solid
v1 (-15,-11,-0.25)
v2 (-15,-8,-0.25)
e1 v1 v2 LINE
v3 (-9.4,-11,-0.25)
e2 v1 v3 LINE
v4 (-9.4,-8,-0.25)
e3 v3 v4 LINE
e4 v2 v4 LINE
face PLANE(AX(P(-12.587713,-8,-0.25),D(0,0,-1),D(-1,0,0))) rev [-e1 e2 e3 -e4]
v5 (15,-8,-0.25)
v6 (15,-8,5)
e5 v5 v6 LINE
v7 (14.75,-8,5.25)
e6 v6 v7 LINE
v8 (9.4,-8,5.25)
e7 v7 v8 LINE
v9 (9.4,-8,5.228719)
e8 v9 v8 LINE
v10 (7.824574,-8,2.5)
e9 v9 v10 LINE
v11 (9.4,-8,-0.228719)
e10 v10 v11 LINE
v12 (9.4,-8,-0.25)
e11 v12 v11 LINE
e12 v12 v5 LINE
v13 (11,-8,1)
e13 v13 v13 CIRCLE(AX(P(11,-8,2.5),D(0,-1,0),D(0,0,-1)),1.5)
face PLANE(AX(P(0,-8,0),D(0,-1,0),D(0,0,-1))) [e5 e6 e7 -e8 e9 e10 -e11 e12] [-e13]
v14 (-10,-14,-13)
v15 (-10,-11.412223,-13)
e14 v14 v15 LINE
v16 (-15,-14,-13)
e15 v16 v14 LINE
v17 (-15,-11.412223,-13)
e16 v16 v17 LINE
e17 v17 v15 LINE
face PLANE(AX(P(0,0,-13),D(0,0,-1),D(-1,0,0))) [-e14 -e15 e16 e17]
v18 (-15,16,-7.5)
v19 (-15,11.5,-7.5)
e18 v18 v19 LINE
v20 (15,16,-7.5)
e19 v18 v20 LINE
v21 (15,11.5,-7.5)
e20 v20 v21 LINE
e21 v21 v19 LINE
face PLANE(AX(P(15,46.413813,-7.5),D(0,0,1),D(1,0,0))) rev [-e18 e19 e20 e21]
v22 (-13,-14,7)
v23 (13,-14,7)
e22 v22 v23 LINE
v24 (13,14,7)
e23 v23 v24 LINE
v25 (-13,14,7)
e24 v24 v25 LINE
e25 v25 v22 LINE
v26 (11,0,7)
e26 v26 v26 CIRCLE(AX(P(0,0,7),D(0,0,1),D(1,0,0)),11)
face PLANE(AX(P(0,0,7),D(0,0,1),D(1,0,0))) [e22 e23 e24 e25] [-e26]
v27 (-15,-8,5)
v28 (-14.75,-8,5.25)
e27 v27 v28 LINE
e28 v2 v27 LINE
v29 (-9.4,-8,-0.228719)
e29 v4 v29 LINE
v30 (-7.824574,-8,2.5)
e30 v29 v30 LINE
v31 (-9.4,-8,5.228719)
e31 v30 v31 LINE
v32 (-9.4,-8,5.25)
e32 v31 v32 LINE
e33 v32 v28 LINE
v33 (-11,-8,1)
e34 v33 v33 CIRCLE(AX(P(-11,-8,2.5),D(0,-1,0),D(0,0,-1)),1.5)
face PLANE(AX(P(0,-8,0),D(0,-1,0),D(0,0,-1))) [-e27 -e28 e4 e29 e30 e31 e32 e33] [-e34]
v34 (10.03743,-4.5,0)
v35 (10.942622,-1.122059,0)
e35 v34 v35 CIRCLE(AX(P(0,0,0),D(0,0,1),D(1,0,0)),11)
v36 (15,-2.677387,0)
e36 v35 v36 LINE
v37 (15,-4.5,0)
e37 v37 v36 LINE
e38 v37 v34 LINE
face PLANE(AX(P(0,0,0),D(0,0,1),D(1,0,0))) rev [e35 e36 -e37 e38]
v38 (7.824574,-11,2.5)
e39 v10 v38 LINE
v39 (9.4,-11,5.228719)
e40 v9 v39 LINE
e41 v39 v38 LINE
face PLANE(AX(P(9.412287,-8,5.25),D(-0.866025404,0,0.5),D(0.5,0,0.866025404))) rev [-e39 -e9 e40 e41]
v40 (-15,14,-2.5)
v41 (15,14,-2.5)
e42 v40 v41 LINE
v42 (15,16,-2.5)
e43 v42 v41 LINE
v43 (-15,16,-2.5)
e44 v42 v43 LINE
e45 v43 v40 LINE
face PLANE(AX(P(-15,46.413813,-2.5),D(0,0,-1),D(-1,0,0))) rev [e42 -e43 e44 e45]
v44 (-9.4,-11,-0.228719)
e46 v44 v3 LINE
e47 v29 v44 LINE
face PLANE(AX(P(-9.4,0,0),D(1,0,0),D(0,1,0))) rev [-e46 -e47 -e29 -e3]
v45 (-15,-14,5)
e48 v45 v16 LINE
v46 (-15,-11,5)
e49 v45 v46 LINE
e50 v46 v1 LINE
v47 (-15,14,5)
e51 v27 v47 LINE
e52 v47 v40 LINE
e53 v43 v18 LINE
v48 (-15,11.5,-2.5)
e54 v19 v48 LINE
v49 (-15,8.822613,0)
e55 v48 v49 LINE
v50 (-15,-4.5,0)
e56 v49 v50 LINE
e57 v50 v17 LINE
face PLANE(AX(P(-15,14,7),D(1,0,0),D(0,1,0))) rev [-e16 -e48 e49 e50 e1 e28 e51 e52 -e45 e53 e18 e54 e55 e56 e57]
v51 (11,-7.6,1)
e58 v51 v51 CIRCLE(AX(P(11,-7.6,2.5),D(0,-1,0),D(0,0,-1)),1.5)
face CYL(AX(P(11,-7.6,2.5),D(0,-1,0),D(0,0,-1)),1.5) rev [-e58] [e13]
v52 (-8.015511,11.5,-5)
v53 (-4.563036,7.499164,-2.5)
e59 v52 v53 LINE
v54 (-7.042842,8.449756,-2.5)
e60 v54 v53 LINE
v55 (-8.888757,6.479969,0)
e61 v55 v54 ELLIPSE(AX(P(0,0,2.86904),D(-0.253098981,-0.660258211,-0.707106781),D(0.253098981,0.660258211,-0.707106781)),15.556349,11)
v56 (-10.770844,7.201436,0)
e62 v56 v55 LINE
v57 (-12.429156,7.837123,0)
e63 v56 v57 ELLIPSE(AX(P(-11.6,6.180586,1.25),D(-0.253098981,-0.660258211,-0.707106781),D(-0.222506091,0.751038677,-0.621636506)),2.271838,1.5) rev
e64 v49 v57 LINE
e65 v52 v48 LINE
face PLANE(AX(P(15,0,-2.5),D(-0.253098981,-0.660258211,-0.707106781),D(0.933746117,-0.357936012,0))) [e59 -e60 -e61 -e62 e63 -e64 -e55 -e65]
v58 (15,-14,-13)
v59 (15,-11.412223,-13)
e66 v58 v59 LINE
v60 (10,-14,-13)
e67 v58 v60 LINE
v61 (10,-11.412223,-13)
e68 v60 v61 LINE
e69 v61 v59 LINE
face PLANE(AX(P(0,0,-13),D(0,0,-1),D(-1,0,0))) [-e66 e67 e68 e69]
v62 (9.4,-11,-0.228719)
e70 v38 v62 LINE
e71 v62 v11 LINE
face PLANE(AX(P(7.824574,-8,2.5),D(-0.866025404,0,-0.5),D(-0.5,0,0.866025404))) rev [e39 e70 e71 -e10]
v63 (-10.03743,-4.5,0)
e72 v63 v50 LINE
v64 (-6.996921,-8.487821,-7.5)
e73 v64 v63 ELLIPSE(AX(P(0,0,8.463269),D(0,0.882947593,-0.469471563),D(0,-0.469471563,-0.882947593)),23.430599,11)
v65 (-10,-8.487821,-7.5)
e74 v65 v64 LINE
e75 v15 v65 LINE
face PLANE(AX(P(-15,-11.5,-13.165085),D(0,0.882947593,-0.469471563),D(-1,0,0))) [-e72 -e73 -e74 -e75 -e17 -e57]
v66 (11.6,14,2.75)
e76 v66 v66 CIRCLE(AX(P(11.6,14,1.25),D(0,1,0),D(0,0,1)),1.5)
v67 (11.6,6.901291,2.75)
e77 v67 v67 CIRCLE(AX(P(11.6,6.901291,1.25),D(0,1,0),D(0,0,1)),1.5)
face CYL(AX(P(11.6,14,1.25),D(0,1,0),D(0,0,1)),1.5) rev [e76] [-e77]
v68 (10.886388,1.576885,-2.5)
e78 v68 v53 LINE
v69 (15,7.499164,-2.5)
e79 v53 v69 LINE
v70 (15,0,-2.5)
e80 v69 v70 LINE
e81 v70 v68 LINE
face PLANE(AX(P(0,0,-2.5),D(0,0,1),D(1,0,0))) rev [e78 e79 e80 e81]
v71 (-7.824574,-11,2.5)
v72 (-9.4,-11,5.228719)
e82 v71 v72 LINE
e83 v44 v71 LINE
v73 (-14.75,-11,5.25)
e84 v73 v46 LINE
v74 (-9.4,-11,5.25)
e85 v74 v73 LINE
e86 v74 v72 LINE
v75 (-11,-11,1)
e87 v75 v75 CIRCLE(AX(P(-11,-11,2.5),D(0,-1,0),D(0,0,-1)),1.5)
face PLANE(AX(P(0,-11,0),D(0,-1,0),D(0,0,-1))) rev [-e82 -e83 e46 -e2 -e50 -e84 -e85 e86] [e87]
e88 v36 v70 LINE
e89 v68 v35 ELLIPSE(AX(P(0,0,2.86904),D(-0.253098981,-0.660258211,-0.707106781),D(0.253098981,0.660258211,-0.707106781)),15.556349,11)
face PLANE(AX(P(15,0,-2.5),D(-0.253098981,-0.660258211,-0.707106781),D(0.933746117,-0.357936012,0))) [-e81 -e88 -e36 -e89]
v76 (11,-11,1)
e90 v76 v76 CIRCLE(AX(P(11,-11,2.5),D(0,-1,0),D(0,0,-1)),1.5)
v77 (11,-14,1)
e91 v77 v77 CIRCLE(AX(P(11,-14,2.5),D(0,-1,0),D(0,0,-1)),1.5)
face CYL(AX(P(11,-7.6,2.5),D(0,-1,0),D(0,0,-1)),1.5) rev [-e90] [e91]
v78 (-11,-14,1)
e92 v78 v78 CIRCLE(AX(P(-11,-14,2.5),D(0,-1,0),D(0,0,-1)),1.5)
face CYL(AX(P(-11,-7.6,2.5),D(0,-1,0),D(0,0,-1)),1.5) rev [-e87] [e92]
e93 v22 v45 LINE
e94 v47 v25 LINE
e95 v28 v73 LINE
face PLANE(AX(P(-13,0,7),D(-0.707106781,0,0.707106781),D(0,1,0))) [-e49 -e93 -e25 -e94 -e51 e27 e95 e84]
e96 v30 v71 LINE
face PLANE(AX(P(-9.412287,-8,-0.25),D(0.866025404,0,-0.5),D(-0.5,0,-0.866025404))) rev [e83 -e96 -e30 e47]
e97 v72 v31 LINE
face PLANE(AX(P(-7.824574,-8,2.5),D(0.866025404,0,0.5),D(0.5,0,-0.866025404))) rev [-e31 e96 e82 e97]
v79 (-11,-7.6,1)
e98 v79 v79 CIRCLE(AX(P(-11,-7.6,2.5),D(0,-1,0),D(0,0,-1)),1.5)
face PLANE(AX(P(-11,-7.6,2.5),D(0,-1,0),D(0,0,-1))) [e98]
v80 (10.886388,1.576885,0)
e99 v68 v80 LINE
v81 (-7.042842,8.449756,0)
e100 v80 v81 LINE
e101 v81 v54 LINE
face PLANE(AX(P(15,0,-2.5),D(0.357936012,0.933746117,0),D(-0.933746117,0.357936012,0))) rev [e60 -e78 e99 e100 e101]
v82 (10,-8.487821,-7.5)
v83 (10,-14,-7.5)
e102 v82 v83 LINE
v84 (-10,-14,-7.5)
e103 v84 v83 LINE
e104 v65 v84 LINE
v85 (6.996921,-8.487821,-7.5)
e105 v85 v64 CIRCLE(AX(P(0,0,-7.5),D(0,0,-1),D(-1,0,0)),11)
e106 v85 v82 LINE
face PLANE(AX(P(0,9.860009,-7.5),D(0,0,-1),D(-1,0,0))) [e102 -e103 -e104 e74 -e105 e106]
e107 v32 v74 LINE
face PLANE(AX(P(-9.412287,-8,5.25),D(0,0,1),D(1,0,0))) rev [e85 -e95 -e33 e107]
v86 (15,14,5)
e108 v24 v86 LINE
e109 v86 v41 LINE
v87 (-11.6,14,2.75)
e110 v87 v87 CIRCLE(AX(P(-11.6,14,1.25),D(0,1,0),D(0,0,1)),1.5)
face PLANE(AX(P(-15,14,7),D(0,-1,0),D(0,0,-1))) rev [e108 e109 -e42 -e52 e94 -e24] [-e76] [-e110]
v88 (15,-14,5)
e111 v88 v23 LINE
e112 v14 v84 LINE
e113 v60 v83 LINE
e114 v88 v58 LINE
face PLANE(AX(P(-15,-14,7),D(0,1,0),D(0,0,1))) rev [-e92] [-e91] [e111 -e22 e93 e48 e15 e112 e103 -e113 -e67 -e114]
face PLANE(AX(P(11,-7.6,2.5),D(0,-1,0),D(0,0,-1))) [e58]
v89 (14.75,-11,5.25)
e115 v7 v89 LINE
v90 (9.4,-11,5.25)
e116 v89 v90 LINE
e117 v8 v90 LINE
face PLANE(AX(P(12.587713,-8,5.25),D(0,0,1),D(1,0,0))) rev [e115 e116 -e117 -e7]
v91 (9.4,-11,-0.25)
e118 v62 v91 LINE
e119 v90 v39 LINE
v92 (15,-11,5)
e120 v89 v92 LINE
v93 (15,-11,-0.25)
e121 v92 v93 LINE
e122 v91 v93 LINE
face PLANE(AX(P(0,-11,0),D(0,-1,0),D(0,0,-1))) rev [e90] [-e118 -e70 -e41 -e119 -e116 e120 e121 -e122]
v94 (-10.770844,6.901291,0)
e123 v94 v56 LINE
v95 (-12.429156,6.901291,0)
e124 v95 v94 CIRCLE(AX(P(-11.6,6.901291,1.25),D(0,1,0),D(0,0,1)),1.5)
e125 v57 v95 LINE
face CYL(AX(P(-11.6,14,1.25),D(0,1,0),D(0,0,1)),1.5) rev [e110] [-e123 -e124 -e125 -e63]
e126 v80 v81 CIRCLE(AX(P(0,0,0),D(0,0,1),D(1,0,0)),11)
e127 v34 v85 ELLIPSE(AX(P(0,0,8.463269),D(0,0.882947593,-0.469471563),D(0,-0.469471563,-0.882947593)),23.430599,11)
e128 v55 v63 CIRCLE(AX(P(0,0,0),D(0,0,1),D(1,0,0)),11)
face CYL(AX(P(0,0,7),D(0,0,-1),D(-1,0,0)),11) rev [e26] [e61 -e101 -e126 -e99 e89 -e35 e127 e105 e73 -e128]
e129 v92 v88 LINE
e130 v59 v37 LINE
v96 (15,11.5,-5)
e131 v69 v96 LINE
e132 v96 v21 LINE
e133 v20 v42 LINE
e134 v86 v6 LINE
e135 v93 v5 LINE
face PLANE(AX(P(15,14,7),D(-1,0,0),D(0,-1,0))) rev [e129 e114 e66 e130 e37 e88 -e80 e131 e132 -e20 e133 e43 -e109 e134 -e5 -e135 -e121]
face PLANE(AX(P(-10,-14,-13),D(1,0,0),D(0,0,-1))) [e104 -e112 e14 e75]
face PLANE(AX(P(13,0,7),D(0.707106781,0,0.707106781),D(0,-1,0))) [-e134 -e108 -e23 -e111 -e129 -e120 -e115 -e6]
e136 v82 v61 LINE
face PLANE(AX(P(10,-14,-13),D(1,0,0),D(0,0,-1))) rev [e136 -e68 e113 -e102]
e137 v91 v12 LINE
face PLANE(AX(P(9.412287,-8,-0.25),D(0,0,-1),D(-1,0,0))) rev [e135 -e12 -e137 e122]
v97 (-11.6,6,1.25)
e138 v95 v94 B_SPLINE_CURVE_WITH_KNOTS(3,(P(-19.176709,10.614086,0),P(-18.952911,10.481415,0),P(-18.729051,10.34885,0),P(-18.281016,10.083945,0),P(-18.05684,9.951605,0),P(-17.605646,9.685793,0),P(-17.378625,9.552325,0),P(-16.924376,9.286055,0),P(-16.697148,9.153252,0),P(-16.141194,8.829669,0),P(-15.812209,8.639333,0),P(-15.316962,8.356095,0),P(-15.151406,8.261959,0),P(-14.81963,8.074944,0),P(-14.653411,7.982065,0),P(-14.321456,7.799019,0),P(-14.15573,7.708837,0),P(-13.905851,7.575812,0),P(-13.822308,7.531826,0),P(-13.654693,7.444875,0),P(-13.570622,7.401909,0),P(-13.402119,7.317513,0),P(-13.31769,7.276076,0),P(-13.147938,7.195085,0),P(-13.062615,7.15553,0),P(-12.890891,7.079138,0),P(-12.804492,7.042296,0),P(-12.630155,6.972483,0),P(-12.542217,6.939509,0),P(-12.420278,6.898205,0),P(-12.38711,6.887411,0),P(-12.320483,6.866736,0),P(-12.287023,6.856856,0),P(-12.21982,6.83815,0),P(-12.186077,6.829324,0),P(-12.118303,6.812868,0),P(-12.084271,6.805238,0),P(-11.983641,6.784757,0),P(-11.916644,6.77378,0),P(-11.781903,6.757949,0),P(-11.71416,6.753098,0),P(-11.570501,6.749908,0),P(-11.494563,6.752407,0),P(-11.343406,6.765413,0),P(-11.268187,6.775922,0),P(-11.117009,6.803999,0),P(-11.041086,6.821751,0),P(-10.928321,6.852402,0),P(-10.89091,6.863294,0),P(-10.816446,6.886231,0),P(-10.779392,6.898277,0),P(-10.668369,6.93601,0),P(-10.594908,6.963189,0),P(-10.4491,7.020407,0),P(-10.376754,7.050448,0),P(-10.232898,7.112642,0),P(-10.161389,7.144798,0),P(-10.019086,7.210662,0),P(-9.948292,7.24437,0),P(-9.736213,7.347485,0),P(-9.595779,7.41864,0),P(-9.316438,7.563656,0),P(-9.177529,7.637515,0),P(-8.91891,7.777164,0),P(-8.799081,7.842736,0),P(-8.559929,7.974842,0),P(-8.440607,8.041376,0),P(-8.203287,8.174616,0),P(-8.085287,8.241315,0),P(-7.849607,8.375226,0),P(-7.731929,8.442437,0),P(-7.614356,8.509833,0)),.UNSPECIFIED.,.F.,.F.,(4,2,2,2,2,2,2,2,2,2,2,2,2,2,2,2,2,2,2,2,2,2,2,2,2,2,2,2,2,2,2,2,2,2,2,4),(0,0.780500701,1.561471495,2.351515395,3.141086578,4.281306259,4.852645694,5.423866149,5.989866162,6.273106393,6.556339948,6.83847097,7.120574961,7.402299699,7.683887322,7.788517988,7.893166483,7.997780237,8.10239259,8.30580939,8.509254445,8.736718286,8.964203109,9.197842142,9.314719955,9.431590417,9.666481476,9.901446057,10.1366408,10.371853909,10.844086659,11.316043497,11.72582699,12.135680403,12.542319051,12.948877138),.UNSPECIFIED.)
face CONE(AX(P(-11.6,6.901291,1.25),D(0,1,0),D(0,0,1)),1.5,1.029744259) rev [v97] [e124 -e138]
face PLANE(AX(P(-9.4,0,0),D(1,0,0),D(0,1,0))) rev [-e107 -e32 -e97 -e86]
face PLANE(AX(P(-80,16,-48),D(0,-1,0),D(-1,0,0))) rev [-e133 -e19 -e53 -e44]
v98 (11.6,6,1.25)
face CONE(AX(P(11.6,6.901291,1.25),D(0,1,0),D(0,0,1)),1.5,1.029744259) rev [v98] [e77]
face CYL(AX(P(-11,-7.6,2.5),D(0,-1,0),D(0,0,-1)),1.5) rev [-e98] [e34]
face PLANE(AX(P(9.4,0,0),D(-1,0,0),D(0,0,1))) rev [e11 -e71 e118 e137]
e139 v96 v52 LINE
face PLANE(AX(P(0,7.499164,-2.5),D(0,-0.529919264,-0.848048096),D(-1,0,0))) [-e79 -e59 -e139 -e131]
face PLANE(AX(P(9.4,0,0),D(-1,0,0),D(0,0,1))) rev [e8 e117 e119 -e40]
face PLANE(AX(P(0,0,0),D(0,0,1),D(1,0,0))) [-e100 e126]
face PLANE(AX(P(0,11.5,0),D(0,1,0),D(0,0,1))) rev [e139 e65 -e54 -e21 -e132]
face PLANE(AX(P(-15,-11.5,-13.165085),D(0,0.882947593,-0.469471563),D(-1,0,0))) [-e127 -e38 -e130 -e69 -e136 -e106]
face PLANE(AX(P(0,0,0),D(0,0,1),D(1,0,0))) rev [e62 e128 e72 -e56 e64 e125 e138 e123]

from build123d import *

# Parameters (mm, degrees)
SKETCH1_W                 = 30
SKETCH1_H                 = 28
SKETCH1_R                 = 11
BOSS_EXTRUDE1_DEPTH       = 7
SKETCH2_W                 = 5
SKETCH2_H                 = 2.5
BOSS_EXTRUDE2_DEPTH       = 13
CHAMFER2_SIZE             = 2
BOSS_EXTRUDE6_DEPTH       = 2.5
CHAMFER3_SIZE             = 2
CHAMFER4_SIZE             = 2
BOSS_EXTRUDE4_DEPTH       = 2.5
CHAMFER6_SIZE             = 2.5
CHAMFER7_SIZE             = 7
CHAMFER7_SIZE_2           = 13.165085257
SKETCH7_R                 = 1.5
CUT_EXTRUDE2_DEPTH        = 6.4
BOSS_EXTRUDE7_START       = -2.5
SKETCH8_W                 = 30
SKETCH8_H                 = 5
BOSS_EXTRUDE7_DEPTH       = 4.5
CHAMFER8_SIZE             = 4.000836323
CHAMFER8_SIZE_2           = 2.5
CUT_EXTRUDE3_START        = -3
SKETCH9_R                 = 1.5
CUT_EXTRUDE3_DEPTH        = 3
SKETCH10_W                = 5.5
SKETCH10_H                = 3
CUT_EXTRUDE4_DEPTH        = 5.6
CUT_EXTRUDE5_START        = -30
SKETCH10_2_W              = 5.5
SKETCH10_2_H              = 3
CUT_EXTRUDE5_DEPTH        = 5.6
F_1_0MM_DOWEL_HOLE1_D     = 3
F_1_0MM_DOWEL_HOLE1_DEPTH = 7.098709071
F_1_0MM_DOWEL_HOLE1_TIP   = 0.901290929


with BuildPart() as part:
    # Sketch1 → Boss-Extrude1 (new body)
    with BuildSketch(Plane.XY):
        Rectangle(SKETCH1_W, SKETCH1_H)
        Circle(SKETCH1_R, mode=Mode.SUBTRACT)
    extrude(amount=BOSS_EXTRUDE1_DEPTH)

    # Sketch2 → Boss-Extrude2 (add)
    with BuildSketch(Plane(origin=(0, 0, 0), x_dir=(-1, 0, 0), z_dir=(0, 0, -1))):
        with Locations((-12.5, -12.75)):
            Rectangle(SKETCH2_W, SKETCH2_H)
        with Locations((12.5, -12.75)):
            Rectangle(SKETCH2_W, SKETCH2_H)
    extrude(amount=BOSS_EXTRUDE2_DEPTH)

    # Chamfer2
    chamfer2_edges = [part.edges().sort_by_distance(p)[0] for p in [
        (-10, -12.75, 0),
        (10, -12.75, 0),
    ]]
    chamfer(chamfer2_edges, length=CHAMFER2_SIZE)

    # Sketch5 → Boss-Extrude6 (add)
    with BuildSketch(Plane.XZ.offset(14)):
        Polygon((-10, -2), (-10, -7.5), (10, -7.5), (10, -2), (8, 0), (-8, 0), align=None)
    extrude(amount=-BOSS_EXTRUDE6_DEPTH)

    # Chamfer3
    chamfer3_edges = [part.edges().sort_by_distance(p)[0] for p in [
        (15, 0, 7),
    ]]
    chamfer(chamfer3_edges, length=CHAMFER3_SIZE)

    # Chamfer4
    chamfer4_edges = [part.edges().sort_by_distance(p)[0] for p in [
        (-15, 0, 7),
    ]]
    chamfer(chamfer4_edges, length=CHAMFER4_SIZE)

    # Sketch4 → Boss-Extrude4 (add)
    with BuildSketch(Plane(origin=(0, 0, 0), x_dir=(-1, 0, 0), z_dir=(0, 0, -1))):
        Polygon((-15, 0), (15, 11.5), (15, 14), (-15, 14), align=None)
    extrude(amount=BOSS_EXTRUDE4_DEPTH)

    # Chamfer6
    # the kernel refuses this chamfer: 2.5 mm, written as the material it adds along each edge
    with BuildSketch(Plane(origin=(21.003247512, -2.30124488, 0), x_dir=(-0.3578006820796162, -0.9333930836859554, 0.02749587661058638), z_dir=(-0.9337461173020497, 0.35793601163245237, 0))) as chamfer6_piece_1_section:
        Polygon((CHAMFER6_SIZE * 0.999621916911, -CHAMFER6_SIZE * 0.0274958766106), (-CHAMFER6_SIZE * 0.0274958766106, -CHAMFER6_SIZE * 0.999621916911), (0, 0), align=None)
    chamfer6_piece_1 = extrude(amount=17.263908412, mode=Mode.PRIVATE)
    chamfer6_piece_1 = chamfer6_piece_1 - Plane(origin=(0, 0, -0.835393566), x_dir=(1, 0, 0), z_dir=(0, 0, -1)) * Cylinder(11, 45, mode=Mode.PRIVATE)
    chamfer6_piece_1 = split(chamfer6_piece_1, bisect_by=Plane(origin=(15, -0.113968884, -0.835393566), z_dir=(-1, 0, 0)), keep=Keep.TOP, mode=Mode.PRIVATE)
    add(chamfer6_piece_1)
    with BuildSketch(Plane(origin=(-1.03959441, 6.148511191, 0), x_dir=(-0.35780068207961624, -0.9333930836859554, 0.02749587661058638), z_dir=(-0.9337461173020497, 0.35793601163245237, 0))) as chamfer6_piece_2_section:
        Polygon((CHAMFER6_SIZE * 0.999621916911, -CHAMFER6_SIZE * 0.0274958766106), (-CHAMFER6_SIZE * 0.0274958766106, -CHAMFER6_SIZE * 0.999621916911), (0, 0), align=None)
    chamfer6_piece_2 = extrude(amount=21.380172546, mode=Mode.PRIVATE)
    chamfer6_piece_2 = chamfer6_piece_2 - Plane(origin=(0, 0, -0.851534645), x_dir=(1, 0, 0), z_dir=(0, 0, -1)) * Cylinder(11, 53, mode=Mode.PRIVATE)
    chamfer6_piece_2 = split(chamfer6_piece_2, bisect_by=Plane(origin=(-15, 9.244820467, -0.851534645), z_dir=(1, 0, 0)), keep=Keep.TOP, mode=Mode.PRIVATE)
    add(chamfer6_piece_2)

    # Chamfer7
    # the kernel refuses this chamfer: 13.165085257, 7 mm, written as the material it adds along each edge
    with BuildSketch(Plane(origin=(-15, -11.5, 0), x_dir=(0, 0.9979482451756082, 0.06402577567608186), z_dir=(1, 0, 0))) as chamfer7_piece_1_section:
        Polygon((CHAMFER7_SIZE * 0.997948245176, -CHAMFER7_SIZE * 0.0640257756761), (-CHAMFER7_SIZE_2 * 0.0640257756781, -CHAMFER7_SIZE_2 * 0.997948245208), (0, 0), align=None)
    chamfer7_piece_1 = extrude(amount=30, mode=Mode.PRIVATE)
    chamfer7_piece_1 = chamfer7_piece_1 - Plane(origin=(0, 0, -3.073682767), x_dir=(1, 0, 0), z_dir=(0, 0, -1)) * Cylinder(11, 113, mode=Mode.PRIVATE)
    chamfer7_piece_1 = split(chamfer7_piece_1, bisect_by=Plane(origin=(-10, -8.887755394, -3.073682767), z_dir=(-1, 0, 0)), keep=Keep.TOP, mode=Mode.PRIVATE)
    chamfer7_piece_1 = split(chamfer7_piece_1, bisect_by=Plane(origin=(-12.500128058, -8.887755394, -7.5), z_dir=(0, 0, 1)), keep=Keep.TOP, mode=Mode.PRIVATE)
    add(chamfer7_piece_1)
    with BuildSketch(Plane(origin=(-15, -11.5, 0), x_dir=(0, 0.9979482451756082, 0.06402577567608186), z_dir=(1, 0, 0))) as chamfer7_piece_2_section:
        Polygon((CHAMFER7_SIZE * 0.997948245176, -CHAMFER7_SIZE * 0.0640257756761), (-CHAMFER7_SIZE_2 * 0.0640257756781, -CHAMFER7_SIZE_2 * 0.997948245208), (0, 0), align=None)
    chamfer7_piece_2 = extrude(amount=30, mode=Mode.PRIVATE)
    chamfer7_piece_2 = split(chamfer7_piece_2, bisect_by=Plane(origin=(-10, -10.721530873, -9.597564575), z_dir=(-1, 0, 0)), keep=Keep.TOP, mode=Mode.PRIVATE)
    chamfer7_piece_2 = split(chamfer7_piece_2, bisect_by=Plane(origin=(-12.5, -10.721530873, -7.5), z_dir=(0, 0, -1)), keep=Keep.TOP, mode=Mode.PRIVATE)
    chamfer7_piece_2 = split(chamfer7_piece_2, bisect_by=Plane(origin=(-12.5, -10.721530873, -13), z_dir=(0, 0, 1)), keep=Keep.TOP, mode=Mode.PRIVATE)
    add(chamfer7_piece_2)
    with BuildSketch(Plane(origin=(-15, -11.5, 0), x_dir=(0, 0.9979482451756082, 0.06402577567608186), z_dir=(1, 0, 0))) as chamfer7_piece_3_section:
        Polygon((CHAMFER7_SIZE * 0.997948245176, -CHAMFER7_SIZE * 0.0640257756761), (-CHAMFER7_SIZE_2 * 0.0640257756781, -CHAMFER7_SIZE_2 * 0.997948245208), (0, 0), align=None)
    chamfer7_piece_3 = extrude(amount=30, mode=Mode.PRIVATE)
    chamfer7_piece_3 = chamfer7_piece_3 - Plane(origin=(0, 0, -3.793876077), x_dir=(1, 0, 0), z_dir=(0, 0, -1)) * Cylinder(11, 113, mode=Mode.PRIVATE)
    chamfer7_piece_3 = split(chamfer7_piece_3, bisect_by=Plane(origin=(-10, -6.598719884, -3.793876077), z_dir=(1, 0, 0)), keep=Keep.TOP, mode=Mode.PRIVATE)
    chamfer7_piece_3 = split(chamfer7_piece_3, bisect_by=Plane(origin=(-9.499486782, -6.598719884, -7.5), z_dir=(0, 0, 1)), keep=Keep.TOP, mode=Mode.PRIVATE)
    chamfer7_piece_3 = split(chamfer7_piece_3, bisect_by=Plane(origin=(10, -6.598719884, -3.793876077), z_dir=(-1, 0, 0)), keep=Keep.TOP, mode=Mode.PRIVATE)
    add(chamfer7_piece_3)
    with BuildSketch(Plane(origin=(-15, -11.5, 0), x_dir=(0, 0.9979482451756082, 0.06402577567608186), z_dir=(1, 0, 0))) as chamfer7_piece_4_section:
        Polygon((CHAMFER7_SIZE * 0.997948245176, -CHAMFER7_SIZE * 0.0640257756761), (-CHAMFER7_SIZE_2 * 0.0640257756781, -CHAMFER7_SIZE_2 * 0.997948245208), (0, 0), align=None)
    chamfer7_piece_4 = extrude(amount=30, mode=Mode.PRIVATE)
    chamfer7_piece_4 = split(chamfer7_piece_4, bisect_by=Plane(origin=(12.5, -10.721530873, -7.5), z_dir=(0, 0, -1)), keep=Keep.TOP, mode=Mode.PRIVATE)
    chamfer7_piece_4 = split(chamfer7_piece_4, bisect_by=Plane(origin=(10, -10.721530873, -9.597564575), z_dir=(1, 0, 0)), keep=Keep.TOP, mode=Mode.PRIVATE)
    chamfer7_piece_4 = split(chamfer7_piece_4, bisect_by=Plane(origin=(12.5, -10.721530873, -13), z_dir=(0, 0, 1)), keep=Keep.TOP, mode=Mode.PRIVATE)
    add(chamfer7_piece_4)
    with BuildSketch(Plane(origin=(-15, -11.5, 0), x_dir=(0, 0.9979482451756082, 0.06402577567608186), z_dir=(1, 0, 0))) as chamfer7_piece_5_section:
        Polygon((CHAMFER7_SIZE * 0.997948245176, -CHAMFER7_SIZE * 0.0640257756761), (-CHAMFER7_SIZE_2 * 0.0640257756781, -CHAMFER7_SIZE_2 * 0.997948245208), (0, 0), align=None)
    chamfer7_piece_5 = extrude(amount=30, mode=Mode.PRIVATE)
    chamfer7_piece_5 = chamfer7_piece_5 - Plane(origin=(0, 0, -3.073682766), x_dir=(1, 0, 0), z_dir=(0, 0, -1)) * Cylinder(11, 113, mode=Mode.PRIVATE)
    chamfer7_piece_5 = split(chamfer7_piece_5, bisect_by=Plane(origin=(12.500128057, -8.887755394, -7.5), z_dir=(0, 0, 1)), keep=Keep.TOP, mode=Mode.PRIVATE)
    chamfer7_piece_5 = split(chamfer7_piece_5, bisect_by=Plane(origin=(10, -8.887755394, -3.073682766), z_dir=(1, 0, 0)), keep=Keep.TOP, mode=Mode.PRIVATE)
    add(chamfer7_piece_5)

    # Sketch7 → Cut-Extrude2 (cut)
    with BuildSketch(Plane.XZ.offset(14)):
        with Locations(Location((-11, 2.5, 0), (0, 0, 270))):
            Circle(SKETCH7_R)
        with Locations(Location((11, 2.5, 0), (0, 0, 270))):
            Circle(SKETCH7_R)
    extrude(amount=-CUT_EXTRUDE2_DEPTH, mode=Mode.SUBTRACT)

    # Sketch8 → Boss-Extrude7 (add)
    with BuildSketch(Plane(origin=(0, 14, 0), x_dir=(1, 0, 0), z_dir=(0, 1, 0)).offset(BOSS_EXTRUDE7_START)):
        with Locations((0, 5)):
            Rectangle(SKETCH8_W, SKETCH8_H)
    extrude(amount=BOSS_EXTRUDE7_DEPTH)

    # Chamfer8
    # the kernel refuses this chamfer: 4.000836323, 2.5 mm, written as the material it adds along each edge
    with BuildSketch(Plane(origin=(-25.343554005, 11.5, -2.5), x_dir=(0, -0.9997899140358645, 0.02049701910421793), z_dir=(1, 0, 0))) as chamfer8_piece_1_section:
        Polygon((CHAMFER8_SIZE * 0.999789913937, CHAMFER8_SIZE * 0.0204970191022), (-CHAMFER8_SIZE_2 * 0.0204970191042, CHAMFER8_SIZE_2 * 0.999789914036), (0, 0), align=None)
    chamfer8_piece_1 = extrude(amount=40.343554005, mode=Mode.PRIVATE)
    chamfer8_piece_1 = split(chamfer8_piece_1, bisect_by=Plane(origin=(2.975759377, 8.202968449, -5.855581208), z_dir=(0.25309898105600476, 0.6602582114512465, 0.707106781186274)), keep=Keep.TOP, mode=Mode.PRIVATE)
    add(chamfer8_piece_1)

    # Sketch9 → Cut-Extrude3 (cut)
    # profile 1 of 2: a face of its own
    with BuildSketch(Plane.XZ.offset(14).offset(CUT_EXTRUDE3_START)):
        Polygon((7.824573519, 2.5), (9.41228676, -0.25), (12.58771324, -0.25), (14.175426481, 2.5), (12.58771324, 5.25), (9.41228676, 5.25), align=None)
        with Locations(Location((11, 2.5, 0), (0, 0, 270))):
            Circle(SKETCH9_R, mode=Mode.SUBTRACT)
    # profile 2 of 2: a face of its own
    with BuildSketch(Plane.XZ.offset(14).offset(CUT_EXTRUDE3_START)):
        Polygon((-7.824573519, 2.5), (-9.41228676, 5.25), (-12.58771324, 5.25), (-14.175426481, 2.5), (-12.58771324, -0.25), (-9.41228676, -0.25), align=None)
        with Locations(Location((-11, 2.5, 0), (0, 0, 270))):
            Circle(SKETCH9_R, mode=Mode.SUBTRACT)
    extrude(amount=-CUT_EXTRUDE3_DEPTH, mode=Mode.SUBTRACT)

    # Sketch10 → Cut-Extrude4 (cut)
    with BuildSketch(Plane(origin=(15, 0, 0), x_dir=(0, 0, -1), z_dir=(1, 0, 0))):
        with Locations((-2.5, -9.5)):
            Rectangle(SKETCH10_W, SKETCH10_H)
    extrude(amount=-CUT_EXTRUDE4_DEPTH, mode=Mode.SUBTRACT)

    # Sketch10<2> → Cut-Extrude5 (cut)
    with BuildSketch(Plane(origin=(15, 0, 0), x_dir=(0, 0, -1), z_dir=(1, 0, 0)).offset(CUT_EXTRUDE5_START)):
        with Locations((-2.5, -9.5)):
            Rectangle(SKETCH10_2_W, SKETCH10_2_H)
    extrude(amount=CUT_EXTRUDE5_DEPTH, mode=Mode.SUBTRACT)

    # Ø1.0mm Dowel Hole1
    with Locations(Plane(origin=(0, 14, 0), x_dir=(1, 0, 0), z_dir=(0, 1, 0))):
        with Locations((-11.6, -1.25), (11.6, -1.25)):
            Hole(F_1_0MM_DOWEL_HOLE1_D / 2, depth=F_1_0MM_DOWEL_HOLE1_DEPTH)
            with Locations((0, 0, -(F_1_0MM_DOWEL_HOLE1_DEPTH + F_1_0MM_DOWEL_HOLE1_TIP / 2))):  # 118° drill point
                Cone(0, F_1_0MM_DOWEL_HOLE1_D / 2, F_1_0MM_DOWEL_HOLE1_TIP, mode=Mode.SUBTRACT)


solid = part.part
